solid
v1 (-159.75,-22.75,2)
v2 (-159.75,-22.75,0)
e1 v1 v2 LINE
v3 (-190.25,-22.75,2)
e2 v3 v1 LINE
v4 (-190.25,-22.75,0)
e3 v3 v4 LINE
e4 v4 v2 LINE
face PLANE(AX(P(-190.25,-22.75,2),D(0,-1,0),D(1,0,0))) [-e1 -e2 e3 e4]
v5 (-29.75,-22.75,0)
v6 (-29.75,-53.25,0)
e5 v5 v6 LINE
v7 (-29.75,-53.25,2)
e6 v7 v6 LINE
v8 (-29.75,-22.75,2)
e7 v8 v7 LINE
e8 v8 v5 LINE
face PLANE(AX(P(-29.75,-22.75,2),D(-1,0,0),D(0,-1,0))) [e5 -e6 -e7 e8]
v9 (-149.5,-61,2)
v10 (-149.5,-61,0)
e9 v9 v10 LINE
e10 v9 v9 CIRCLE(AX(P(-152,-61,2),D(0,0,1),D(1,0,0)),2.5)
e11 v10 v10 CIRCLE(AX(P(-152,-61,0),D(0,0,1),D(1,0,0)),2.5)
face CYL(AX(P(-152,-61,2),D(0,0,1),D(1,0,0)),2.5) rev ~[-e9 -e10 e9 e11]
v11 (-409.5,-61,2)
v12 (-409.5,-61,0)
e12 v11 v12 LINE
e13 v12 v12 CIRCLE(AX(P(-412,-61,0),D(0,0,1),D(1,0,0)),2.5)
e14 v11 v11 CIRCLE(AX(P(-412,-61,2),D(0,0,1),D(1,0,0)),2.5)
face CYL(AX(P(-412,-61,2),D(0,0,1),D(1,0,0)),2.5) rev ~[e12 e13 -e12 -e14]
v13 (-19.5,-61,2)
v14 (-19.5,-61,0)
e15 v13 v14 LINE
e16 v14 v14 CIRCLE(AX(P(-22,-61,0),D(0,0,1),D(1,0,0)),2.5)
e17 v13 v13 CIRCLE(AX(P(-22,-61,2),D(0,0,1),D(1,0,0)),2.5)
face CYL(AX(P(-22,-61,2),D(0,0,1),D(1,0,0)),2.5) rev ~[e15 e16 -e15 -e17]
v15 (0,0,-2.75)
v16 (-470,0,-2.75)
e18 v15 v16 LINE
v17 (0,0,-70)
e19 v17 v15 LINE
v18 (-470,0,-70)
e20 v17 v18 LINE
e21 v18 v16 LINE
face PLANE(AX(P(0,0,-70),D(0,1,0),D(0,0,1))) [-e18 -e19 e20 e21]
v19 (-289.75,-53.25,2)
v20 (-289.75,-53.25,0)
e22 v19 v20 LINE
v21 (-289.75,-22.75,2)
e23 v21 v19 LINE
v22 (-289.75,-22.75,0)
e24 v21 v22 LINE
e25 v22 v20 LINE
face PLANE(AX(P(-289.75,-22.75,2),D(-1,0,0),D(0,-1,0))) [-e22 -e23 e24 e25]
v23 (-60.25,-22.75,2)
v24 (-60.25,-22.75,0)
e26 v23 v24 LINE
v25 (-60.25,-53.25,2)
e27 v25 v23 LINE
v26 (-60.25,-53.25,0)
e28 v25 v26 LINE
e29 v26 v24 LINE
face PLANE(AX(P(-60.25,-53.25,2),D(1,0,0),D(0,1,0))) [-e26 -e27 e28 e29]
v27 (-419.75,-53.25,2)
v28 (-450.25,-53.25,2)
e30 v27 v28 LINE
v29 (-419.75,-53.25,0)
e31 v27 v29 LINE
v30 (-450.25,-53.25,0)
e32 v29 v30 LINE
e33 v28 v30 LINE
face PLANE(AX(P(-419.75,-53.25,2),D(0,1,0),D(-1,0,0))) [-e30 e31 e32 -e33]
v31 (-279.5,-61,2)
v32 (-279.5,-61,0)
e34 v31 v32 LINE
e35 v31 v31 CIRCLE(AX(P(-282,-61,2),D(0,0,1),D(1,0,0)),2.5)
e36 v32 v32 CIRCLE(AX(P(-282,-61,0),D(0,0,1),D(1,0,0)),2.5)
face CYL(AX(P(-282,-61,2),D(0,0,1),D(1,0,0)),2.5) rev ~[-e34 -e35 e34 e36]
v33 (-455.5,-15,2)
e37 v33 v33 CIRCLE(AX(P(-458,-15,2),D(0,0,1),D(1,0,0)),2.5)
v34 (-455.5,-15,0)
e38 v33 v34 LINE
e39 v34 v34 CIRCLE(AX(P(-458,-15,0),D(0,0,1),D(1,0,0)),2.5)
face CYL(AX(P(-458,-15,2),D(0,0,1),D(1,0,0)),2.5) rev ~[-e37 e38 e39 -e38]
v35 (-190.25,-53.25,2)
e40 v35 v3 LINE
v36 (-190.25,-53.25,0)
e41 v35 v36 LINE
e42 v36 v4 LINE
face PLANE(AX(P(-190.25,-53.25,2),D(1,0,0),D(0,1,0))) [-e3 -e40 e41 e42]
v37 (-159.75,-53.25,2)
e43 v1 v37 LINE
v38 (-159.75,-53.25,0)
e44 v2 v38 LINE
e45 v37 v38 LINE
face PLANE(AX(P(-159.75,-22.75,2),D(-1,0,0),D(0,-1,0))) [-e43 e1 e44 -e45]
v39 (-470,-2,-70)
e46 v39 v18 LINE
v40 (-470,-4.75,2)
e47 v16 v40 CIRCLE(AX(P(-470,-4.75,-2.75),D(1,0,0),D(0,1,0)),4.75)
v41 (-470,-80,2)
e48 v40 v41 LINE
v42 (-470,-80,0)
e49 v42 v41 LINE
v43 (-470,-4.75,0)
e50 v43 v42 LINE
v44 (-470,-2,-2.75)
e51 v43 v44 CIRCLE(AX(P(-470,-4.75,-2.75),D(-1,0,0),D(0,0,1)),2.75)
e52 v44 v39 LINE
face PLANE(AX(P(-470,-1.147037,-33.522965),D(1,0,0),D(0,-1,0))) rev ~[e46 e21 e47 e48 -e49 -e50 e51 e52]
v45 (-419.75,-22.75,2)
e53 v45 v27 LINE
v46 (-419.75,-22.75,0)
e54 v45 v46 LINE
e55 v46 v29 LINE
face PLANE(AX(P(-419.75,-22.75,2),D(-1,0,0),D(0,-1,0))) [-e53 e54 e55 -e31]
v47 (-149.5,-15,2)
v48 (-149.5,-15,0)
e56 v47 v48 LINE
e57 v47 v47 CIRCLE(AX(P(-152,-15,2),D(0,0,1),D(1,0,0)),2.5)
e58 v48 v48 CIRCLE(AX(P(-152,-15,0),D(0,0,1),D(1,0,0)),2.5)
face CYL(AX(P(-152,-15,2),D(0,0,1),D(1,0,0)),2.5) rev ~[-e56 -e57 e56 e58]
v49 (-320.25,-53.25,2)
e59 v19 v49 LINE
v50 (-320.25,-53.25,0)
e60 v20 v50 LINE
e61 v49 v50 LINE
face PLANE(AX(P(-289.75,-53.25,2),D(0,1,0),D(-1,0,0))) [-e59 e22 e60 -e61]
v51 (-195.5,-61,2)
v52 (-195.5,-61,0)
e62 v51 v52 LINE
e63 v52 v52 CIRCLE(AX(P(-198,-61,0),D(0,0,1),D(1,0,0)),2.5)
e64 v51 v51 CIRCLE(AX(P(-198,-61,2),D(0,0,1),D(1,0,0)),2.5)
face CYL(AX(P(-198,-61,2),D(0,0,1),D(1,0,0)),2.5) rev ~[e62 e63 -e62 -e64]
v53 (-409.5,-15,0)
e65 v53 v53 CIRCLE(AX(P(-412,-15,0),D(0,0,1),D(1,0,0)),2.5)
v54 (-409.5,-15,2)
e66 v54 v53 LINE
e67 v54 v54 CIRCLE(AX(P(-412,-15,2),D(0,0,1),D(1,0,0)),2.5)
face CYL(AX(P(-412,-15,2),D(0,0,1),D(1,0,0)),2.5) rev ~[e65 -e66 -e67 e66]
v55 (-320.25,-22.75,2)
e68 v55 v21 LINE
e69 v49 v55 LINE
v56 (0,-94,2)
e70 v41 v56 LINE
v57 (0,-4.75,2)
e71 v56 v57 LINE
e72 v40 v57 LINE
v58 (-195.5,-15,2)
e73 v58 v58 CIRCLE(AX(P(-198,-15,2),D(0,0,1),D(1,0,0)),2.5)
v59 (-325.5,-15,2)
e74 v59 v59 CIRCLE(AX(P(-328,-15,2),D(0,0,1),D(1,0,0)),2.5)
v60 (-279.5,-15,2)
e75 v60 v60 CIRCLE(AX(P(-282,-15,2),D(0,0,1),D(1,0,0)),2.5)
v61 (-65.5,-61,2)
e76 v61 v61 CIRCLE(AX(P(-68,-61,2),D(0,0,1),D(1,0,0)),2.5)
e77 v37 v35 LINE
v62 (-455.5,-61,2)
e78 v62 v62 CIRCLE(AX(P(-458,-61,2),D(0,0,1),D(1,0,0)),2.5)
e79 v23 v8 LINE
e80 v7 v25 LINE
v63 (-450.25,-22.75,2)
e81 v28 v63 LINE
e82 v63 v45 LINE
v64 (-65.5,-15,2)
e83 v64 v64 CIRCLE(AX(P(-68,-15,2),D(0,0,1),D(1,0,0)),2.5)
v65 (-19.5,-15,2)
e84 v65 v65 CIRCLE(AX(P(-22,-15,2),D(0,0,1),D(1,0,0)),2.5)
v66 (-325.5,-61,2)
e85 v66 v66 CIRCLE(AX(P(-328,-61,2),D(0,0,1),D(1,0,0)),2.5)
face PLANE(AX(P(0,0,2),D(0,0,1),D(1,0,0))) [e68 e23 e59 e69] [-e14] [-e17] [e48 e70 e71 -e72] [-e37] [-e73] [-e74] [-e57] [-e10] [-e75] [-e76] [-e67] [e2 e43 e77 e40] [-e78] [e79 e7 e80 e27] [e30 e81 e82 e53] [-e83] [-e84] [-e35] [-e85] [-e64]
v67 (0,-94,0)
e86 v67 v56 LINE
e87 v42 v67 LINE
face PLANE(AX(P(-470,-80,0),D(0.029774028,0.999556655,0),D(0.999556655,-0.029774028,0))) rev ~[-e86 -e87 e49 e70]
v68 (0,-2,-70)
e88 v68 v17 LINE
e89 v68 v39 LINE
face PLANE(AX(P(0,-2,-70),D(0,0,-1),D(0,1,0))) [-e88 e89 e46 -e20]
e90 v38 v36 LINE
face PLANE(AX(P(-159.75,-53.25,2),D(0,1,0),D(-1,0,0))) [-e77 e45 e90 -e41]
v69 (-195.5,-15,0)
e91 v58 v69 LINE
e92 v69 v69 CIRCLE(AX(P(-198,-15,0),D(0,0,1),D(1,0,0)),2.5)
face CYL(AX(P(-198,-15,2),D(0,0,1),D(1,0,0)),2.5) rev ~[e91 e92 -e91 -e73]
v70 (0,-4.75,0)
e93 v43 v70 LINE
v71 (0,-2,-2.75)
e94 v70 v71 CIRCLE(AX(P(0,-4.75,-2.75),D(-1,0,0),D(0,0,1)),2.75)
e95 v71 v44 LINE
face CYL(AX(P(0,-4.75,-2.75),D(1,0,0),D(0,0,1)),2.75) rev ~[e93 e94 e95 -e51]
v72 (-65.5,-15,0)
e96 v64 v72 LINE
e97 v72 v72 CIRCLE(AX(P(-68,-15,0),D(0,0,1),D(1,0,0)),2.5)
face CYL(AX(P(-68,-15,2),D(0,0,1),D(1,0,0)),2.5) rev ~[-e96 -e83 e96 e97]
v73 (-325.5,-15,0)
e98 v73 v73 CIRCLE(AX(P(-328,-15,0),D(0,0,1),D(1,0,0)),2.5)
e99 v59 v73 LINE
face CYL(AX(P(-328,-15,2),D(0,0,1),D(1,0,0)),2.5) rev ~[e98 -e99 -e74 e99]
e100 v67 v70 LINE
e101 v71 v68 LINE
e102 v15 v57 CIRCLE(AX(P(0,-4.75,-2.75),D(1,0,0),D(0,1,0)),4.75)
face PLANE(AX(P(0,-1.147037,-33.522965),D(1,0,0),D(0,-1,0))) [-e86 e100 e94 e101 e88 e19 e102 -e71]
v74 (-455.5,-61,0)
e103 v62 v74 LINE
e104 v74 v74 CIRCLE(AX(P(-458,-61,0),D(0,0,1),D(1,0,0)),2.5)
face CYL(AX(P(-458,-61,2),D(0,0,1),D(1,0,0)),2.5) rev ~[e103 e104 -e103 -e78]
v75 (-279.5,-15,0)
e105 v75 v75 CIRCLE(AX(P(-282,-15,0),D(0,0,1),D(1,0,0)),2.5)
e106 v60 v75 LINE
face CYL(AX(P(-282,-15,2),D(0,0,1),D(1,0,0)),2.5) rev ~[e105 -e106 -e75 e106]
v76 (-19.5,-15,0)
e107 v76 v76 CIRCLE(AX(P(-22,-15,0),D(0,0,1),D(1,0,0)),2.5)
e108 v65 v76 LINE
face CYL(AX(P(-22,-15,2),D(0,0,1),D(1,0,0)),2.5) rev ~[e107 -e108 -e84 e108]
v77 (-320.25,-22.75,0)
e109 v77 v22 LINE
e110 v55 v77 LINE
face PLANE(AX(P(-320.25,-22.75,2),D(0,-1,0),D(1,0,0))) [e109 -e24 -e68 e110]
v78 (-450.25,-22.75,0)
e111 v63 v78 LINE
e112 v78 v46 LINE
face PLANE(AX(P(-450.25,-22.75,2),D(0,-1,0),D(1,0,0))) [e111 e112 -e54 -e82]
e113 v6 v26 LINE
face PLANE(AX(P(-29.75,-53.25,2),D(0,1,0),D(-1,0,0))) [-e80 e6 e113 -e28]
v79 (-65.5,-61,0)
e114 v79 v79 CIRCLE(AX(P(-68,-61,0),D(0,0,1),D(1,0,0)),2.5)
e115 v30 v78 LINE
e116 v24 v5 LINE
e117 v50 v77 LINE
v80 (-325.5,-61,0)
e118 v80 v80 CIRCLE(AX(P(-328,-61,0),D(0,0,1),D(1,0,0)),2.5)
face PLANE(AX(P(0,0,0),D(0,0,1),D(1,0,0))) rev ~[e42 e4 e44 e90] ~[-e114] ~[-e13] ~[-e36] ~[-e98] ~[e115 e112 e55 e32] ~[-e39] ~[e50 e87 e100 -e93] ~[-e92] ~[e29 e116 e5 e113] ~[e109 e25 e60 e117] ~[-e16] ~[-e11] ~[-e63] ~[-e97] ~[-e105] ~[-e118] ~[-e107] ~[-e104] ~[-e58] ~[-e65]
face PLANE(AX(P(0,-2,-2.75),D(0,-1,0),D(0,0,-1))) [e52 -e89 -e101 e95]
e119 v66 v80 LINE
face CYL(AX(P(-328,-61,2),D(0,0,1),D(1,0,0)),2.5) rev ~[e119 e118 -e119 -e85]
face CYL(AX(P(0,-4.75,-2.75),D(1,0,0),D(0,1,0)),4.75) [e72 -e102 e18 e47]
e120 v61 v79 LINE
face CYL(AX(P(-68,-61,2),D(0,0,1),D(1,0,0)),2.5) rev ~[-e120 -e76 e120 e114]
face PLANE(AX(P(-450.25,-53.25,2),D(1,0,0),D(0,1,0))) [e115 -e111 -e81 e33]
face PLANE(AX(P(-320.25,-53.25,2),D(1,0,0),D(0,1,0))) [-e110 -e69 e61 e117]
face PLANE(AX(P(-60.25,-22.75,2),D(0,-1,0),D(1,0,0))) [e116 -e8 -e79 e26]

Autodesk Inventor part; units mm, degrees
ref_plane "YZ Plane" through (0, 0, 0) normal (1, 0, 0) x (0, 1, 0)
ref_plane "XZ Plane" through (0, 0, 0) normal (0, 1, 0) x (-1, 0, 0)
ref_plane "XY Plane" through (0, 0, 0) normal (0, 0, 1) x (1, 0, 0)
sketch "Sketch1" plane through (0, 0, 0) normal (0, 0, 1) x (1, 0, 0)
  line L0 (0, 0) -> (-470, 0)
  line L1 (0, -94) -> (0, 0)
  line L2 (-470, 0) -> (-470, -80)
  line L3 (-470, -80) -> (0, -94)
  point P0 (0, -47)
  dimension "d32" = 94
  dimension "d60" = 80
  dimension "d61" = 470
extrude "Plate1" add sketch "Sketch1" along normal blind 2
sketch "Sketch8" plane through (0, 0, 2) normal (0, 0, 1) x (1, 0, 0)
  line L0 (-29.75, -53.25) -> (-60.25, -53.25)
  line L1 (-60.25, -53.25) -> (-60.25, -22.75)
  line L2 (-60.25, -22.75) -> (-29.75, -22.75)
  line L3 (-29.75, -22.75) -> (-29.75, -53.25)
  line L4 (-29.75, -53.25) -> (-60.25, -22.75) construction
  line L5 (-60.25, -53.25) -> (-29.75, -22.75) construction
  circle A0 centre (-22, -61) radius 2.5
  circle A1 centre (-68, -61) radius 2.5
  circle A2 centre (-68, -15) radius 2.5
  circle A3 centre (-22, -15) radius 2.5
  line L6 (0, 0) -> (0, -94) projected
  line L7 (-470, 0) -> (0, 0) projected
  line L8 (-60.25, -53.25) -> (-68, -61) construction
  line L9 (-68, -15) -> (-22, -15) construction
  line L10 (-22, -15) -> (-22, -61) construction
  line L11 (-22, -61) -> (-68, -61) construction
  line L12 (-68, -61) -> (-68, -15) construction
  point P0 (-45, -38)
  dimension "d51" = 30.5
  dimension "d52" = 30.5
  dimension "d53" = 5
  dimension "d72" = 45
  dimension "d78" = 46
  dimension "d79" = 15
extrude "Cut3" cut sketch "Sketch8" against normal blind 2
pattern_linear "Rectangular Pattern1" count 4 spacing 130 along (-1, 0, 0) of "Cut3"
sketch "Sketch9" plane through (0, -2, 2) normal (0, 1, 0) x (-1, 0, 0)
  line L0 (470, 0) -> (0, 0)
  line L1 (0, 0) -> (0, -72)
  line L2 (0, -72) -> (470, -72)
  line L3 (470, -72) -> (470, 0)
edge flange "Flange3" height 72 angle 90 thickness 2 bend radius 2.75 thickness toward (0, 1, 0) relief round relief width 2 relief depth 1 edges at (-235, 0, 0) wall of the first edge with corners at (-470, -2, 2) (0, -2, 2) (0, -2, -70) (-470, -2, -70)
bend "Bend3"
corner "Corner3"
equation "\"d51\" = d52"
equation "\"d55\" = Thickness"
equation "\"d2\" = Thickness"
equation "\"d62\" = BendReliefWidth"
equation "\"d63\" = BendReliefDepth"
equation "\"d64\" = MinimumRemnant"
equation "\"d65\" = TransitionRadius"
equation "\"d68\" = BendRadius"
equation "\"d69\" = CornerReliefSize"
equation "\"d70\" = GapSize"
equation "\"d71\" = JacobiRadiusSize"
equation "\"BendReliefWidth\" = Thickness"
equation "\"BendReliefDepth\" = 0.5 * Thickness"
equation "\"CornerReliefSize\" = 4 * Thickness"
equation "\"MinimumRemnant\" = 2 * Thickness"
equation "\"TransitionRadius\" = BendRadius"
equation "\"JacobiRadiusSize\" = BendRadius"
equation "\"GapSize\" = Thickness"
equation "\"Thickness\" = 2"
equation "\"BendRadius\" = 2.75"
properties part number "PRS 1422 DrSysB diameter way up_D1200" material "Stainless Steel"
